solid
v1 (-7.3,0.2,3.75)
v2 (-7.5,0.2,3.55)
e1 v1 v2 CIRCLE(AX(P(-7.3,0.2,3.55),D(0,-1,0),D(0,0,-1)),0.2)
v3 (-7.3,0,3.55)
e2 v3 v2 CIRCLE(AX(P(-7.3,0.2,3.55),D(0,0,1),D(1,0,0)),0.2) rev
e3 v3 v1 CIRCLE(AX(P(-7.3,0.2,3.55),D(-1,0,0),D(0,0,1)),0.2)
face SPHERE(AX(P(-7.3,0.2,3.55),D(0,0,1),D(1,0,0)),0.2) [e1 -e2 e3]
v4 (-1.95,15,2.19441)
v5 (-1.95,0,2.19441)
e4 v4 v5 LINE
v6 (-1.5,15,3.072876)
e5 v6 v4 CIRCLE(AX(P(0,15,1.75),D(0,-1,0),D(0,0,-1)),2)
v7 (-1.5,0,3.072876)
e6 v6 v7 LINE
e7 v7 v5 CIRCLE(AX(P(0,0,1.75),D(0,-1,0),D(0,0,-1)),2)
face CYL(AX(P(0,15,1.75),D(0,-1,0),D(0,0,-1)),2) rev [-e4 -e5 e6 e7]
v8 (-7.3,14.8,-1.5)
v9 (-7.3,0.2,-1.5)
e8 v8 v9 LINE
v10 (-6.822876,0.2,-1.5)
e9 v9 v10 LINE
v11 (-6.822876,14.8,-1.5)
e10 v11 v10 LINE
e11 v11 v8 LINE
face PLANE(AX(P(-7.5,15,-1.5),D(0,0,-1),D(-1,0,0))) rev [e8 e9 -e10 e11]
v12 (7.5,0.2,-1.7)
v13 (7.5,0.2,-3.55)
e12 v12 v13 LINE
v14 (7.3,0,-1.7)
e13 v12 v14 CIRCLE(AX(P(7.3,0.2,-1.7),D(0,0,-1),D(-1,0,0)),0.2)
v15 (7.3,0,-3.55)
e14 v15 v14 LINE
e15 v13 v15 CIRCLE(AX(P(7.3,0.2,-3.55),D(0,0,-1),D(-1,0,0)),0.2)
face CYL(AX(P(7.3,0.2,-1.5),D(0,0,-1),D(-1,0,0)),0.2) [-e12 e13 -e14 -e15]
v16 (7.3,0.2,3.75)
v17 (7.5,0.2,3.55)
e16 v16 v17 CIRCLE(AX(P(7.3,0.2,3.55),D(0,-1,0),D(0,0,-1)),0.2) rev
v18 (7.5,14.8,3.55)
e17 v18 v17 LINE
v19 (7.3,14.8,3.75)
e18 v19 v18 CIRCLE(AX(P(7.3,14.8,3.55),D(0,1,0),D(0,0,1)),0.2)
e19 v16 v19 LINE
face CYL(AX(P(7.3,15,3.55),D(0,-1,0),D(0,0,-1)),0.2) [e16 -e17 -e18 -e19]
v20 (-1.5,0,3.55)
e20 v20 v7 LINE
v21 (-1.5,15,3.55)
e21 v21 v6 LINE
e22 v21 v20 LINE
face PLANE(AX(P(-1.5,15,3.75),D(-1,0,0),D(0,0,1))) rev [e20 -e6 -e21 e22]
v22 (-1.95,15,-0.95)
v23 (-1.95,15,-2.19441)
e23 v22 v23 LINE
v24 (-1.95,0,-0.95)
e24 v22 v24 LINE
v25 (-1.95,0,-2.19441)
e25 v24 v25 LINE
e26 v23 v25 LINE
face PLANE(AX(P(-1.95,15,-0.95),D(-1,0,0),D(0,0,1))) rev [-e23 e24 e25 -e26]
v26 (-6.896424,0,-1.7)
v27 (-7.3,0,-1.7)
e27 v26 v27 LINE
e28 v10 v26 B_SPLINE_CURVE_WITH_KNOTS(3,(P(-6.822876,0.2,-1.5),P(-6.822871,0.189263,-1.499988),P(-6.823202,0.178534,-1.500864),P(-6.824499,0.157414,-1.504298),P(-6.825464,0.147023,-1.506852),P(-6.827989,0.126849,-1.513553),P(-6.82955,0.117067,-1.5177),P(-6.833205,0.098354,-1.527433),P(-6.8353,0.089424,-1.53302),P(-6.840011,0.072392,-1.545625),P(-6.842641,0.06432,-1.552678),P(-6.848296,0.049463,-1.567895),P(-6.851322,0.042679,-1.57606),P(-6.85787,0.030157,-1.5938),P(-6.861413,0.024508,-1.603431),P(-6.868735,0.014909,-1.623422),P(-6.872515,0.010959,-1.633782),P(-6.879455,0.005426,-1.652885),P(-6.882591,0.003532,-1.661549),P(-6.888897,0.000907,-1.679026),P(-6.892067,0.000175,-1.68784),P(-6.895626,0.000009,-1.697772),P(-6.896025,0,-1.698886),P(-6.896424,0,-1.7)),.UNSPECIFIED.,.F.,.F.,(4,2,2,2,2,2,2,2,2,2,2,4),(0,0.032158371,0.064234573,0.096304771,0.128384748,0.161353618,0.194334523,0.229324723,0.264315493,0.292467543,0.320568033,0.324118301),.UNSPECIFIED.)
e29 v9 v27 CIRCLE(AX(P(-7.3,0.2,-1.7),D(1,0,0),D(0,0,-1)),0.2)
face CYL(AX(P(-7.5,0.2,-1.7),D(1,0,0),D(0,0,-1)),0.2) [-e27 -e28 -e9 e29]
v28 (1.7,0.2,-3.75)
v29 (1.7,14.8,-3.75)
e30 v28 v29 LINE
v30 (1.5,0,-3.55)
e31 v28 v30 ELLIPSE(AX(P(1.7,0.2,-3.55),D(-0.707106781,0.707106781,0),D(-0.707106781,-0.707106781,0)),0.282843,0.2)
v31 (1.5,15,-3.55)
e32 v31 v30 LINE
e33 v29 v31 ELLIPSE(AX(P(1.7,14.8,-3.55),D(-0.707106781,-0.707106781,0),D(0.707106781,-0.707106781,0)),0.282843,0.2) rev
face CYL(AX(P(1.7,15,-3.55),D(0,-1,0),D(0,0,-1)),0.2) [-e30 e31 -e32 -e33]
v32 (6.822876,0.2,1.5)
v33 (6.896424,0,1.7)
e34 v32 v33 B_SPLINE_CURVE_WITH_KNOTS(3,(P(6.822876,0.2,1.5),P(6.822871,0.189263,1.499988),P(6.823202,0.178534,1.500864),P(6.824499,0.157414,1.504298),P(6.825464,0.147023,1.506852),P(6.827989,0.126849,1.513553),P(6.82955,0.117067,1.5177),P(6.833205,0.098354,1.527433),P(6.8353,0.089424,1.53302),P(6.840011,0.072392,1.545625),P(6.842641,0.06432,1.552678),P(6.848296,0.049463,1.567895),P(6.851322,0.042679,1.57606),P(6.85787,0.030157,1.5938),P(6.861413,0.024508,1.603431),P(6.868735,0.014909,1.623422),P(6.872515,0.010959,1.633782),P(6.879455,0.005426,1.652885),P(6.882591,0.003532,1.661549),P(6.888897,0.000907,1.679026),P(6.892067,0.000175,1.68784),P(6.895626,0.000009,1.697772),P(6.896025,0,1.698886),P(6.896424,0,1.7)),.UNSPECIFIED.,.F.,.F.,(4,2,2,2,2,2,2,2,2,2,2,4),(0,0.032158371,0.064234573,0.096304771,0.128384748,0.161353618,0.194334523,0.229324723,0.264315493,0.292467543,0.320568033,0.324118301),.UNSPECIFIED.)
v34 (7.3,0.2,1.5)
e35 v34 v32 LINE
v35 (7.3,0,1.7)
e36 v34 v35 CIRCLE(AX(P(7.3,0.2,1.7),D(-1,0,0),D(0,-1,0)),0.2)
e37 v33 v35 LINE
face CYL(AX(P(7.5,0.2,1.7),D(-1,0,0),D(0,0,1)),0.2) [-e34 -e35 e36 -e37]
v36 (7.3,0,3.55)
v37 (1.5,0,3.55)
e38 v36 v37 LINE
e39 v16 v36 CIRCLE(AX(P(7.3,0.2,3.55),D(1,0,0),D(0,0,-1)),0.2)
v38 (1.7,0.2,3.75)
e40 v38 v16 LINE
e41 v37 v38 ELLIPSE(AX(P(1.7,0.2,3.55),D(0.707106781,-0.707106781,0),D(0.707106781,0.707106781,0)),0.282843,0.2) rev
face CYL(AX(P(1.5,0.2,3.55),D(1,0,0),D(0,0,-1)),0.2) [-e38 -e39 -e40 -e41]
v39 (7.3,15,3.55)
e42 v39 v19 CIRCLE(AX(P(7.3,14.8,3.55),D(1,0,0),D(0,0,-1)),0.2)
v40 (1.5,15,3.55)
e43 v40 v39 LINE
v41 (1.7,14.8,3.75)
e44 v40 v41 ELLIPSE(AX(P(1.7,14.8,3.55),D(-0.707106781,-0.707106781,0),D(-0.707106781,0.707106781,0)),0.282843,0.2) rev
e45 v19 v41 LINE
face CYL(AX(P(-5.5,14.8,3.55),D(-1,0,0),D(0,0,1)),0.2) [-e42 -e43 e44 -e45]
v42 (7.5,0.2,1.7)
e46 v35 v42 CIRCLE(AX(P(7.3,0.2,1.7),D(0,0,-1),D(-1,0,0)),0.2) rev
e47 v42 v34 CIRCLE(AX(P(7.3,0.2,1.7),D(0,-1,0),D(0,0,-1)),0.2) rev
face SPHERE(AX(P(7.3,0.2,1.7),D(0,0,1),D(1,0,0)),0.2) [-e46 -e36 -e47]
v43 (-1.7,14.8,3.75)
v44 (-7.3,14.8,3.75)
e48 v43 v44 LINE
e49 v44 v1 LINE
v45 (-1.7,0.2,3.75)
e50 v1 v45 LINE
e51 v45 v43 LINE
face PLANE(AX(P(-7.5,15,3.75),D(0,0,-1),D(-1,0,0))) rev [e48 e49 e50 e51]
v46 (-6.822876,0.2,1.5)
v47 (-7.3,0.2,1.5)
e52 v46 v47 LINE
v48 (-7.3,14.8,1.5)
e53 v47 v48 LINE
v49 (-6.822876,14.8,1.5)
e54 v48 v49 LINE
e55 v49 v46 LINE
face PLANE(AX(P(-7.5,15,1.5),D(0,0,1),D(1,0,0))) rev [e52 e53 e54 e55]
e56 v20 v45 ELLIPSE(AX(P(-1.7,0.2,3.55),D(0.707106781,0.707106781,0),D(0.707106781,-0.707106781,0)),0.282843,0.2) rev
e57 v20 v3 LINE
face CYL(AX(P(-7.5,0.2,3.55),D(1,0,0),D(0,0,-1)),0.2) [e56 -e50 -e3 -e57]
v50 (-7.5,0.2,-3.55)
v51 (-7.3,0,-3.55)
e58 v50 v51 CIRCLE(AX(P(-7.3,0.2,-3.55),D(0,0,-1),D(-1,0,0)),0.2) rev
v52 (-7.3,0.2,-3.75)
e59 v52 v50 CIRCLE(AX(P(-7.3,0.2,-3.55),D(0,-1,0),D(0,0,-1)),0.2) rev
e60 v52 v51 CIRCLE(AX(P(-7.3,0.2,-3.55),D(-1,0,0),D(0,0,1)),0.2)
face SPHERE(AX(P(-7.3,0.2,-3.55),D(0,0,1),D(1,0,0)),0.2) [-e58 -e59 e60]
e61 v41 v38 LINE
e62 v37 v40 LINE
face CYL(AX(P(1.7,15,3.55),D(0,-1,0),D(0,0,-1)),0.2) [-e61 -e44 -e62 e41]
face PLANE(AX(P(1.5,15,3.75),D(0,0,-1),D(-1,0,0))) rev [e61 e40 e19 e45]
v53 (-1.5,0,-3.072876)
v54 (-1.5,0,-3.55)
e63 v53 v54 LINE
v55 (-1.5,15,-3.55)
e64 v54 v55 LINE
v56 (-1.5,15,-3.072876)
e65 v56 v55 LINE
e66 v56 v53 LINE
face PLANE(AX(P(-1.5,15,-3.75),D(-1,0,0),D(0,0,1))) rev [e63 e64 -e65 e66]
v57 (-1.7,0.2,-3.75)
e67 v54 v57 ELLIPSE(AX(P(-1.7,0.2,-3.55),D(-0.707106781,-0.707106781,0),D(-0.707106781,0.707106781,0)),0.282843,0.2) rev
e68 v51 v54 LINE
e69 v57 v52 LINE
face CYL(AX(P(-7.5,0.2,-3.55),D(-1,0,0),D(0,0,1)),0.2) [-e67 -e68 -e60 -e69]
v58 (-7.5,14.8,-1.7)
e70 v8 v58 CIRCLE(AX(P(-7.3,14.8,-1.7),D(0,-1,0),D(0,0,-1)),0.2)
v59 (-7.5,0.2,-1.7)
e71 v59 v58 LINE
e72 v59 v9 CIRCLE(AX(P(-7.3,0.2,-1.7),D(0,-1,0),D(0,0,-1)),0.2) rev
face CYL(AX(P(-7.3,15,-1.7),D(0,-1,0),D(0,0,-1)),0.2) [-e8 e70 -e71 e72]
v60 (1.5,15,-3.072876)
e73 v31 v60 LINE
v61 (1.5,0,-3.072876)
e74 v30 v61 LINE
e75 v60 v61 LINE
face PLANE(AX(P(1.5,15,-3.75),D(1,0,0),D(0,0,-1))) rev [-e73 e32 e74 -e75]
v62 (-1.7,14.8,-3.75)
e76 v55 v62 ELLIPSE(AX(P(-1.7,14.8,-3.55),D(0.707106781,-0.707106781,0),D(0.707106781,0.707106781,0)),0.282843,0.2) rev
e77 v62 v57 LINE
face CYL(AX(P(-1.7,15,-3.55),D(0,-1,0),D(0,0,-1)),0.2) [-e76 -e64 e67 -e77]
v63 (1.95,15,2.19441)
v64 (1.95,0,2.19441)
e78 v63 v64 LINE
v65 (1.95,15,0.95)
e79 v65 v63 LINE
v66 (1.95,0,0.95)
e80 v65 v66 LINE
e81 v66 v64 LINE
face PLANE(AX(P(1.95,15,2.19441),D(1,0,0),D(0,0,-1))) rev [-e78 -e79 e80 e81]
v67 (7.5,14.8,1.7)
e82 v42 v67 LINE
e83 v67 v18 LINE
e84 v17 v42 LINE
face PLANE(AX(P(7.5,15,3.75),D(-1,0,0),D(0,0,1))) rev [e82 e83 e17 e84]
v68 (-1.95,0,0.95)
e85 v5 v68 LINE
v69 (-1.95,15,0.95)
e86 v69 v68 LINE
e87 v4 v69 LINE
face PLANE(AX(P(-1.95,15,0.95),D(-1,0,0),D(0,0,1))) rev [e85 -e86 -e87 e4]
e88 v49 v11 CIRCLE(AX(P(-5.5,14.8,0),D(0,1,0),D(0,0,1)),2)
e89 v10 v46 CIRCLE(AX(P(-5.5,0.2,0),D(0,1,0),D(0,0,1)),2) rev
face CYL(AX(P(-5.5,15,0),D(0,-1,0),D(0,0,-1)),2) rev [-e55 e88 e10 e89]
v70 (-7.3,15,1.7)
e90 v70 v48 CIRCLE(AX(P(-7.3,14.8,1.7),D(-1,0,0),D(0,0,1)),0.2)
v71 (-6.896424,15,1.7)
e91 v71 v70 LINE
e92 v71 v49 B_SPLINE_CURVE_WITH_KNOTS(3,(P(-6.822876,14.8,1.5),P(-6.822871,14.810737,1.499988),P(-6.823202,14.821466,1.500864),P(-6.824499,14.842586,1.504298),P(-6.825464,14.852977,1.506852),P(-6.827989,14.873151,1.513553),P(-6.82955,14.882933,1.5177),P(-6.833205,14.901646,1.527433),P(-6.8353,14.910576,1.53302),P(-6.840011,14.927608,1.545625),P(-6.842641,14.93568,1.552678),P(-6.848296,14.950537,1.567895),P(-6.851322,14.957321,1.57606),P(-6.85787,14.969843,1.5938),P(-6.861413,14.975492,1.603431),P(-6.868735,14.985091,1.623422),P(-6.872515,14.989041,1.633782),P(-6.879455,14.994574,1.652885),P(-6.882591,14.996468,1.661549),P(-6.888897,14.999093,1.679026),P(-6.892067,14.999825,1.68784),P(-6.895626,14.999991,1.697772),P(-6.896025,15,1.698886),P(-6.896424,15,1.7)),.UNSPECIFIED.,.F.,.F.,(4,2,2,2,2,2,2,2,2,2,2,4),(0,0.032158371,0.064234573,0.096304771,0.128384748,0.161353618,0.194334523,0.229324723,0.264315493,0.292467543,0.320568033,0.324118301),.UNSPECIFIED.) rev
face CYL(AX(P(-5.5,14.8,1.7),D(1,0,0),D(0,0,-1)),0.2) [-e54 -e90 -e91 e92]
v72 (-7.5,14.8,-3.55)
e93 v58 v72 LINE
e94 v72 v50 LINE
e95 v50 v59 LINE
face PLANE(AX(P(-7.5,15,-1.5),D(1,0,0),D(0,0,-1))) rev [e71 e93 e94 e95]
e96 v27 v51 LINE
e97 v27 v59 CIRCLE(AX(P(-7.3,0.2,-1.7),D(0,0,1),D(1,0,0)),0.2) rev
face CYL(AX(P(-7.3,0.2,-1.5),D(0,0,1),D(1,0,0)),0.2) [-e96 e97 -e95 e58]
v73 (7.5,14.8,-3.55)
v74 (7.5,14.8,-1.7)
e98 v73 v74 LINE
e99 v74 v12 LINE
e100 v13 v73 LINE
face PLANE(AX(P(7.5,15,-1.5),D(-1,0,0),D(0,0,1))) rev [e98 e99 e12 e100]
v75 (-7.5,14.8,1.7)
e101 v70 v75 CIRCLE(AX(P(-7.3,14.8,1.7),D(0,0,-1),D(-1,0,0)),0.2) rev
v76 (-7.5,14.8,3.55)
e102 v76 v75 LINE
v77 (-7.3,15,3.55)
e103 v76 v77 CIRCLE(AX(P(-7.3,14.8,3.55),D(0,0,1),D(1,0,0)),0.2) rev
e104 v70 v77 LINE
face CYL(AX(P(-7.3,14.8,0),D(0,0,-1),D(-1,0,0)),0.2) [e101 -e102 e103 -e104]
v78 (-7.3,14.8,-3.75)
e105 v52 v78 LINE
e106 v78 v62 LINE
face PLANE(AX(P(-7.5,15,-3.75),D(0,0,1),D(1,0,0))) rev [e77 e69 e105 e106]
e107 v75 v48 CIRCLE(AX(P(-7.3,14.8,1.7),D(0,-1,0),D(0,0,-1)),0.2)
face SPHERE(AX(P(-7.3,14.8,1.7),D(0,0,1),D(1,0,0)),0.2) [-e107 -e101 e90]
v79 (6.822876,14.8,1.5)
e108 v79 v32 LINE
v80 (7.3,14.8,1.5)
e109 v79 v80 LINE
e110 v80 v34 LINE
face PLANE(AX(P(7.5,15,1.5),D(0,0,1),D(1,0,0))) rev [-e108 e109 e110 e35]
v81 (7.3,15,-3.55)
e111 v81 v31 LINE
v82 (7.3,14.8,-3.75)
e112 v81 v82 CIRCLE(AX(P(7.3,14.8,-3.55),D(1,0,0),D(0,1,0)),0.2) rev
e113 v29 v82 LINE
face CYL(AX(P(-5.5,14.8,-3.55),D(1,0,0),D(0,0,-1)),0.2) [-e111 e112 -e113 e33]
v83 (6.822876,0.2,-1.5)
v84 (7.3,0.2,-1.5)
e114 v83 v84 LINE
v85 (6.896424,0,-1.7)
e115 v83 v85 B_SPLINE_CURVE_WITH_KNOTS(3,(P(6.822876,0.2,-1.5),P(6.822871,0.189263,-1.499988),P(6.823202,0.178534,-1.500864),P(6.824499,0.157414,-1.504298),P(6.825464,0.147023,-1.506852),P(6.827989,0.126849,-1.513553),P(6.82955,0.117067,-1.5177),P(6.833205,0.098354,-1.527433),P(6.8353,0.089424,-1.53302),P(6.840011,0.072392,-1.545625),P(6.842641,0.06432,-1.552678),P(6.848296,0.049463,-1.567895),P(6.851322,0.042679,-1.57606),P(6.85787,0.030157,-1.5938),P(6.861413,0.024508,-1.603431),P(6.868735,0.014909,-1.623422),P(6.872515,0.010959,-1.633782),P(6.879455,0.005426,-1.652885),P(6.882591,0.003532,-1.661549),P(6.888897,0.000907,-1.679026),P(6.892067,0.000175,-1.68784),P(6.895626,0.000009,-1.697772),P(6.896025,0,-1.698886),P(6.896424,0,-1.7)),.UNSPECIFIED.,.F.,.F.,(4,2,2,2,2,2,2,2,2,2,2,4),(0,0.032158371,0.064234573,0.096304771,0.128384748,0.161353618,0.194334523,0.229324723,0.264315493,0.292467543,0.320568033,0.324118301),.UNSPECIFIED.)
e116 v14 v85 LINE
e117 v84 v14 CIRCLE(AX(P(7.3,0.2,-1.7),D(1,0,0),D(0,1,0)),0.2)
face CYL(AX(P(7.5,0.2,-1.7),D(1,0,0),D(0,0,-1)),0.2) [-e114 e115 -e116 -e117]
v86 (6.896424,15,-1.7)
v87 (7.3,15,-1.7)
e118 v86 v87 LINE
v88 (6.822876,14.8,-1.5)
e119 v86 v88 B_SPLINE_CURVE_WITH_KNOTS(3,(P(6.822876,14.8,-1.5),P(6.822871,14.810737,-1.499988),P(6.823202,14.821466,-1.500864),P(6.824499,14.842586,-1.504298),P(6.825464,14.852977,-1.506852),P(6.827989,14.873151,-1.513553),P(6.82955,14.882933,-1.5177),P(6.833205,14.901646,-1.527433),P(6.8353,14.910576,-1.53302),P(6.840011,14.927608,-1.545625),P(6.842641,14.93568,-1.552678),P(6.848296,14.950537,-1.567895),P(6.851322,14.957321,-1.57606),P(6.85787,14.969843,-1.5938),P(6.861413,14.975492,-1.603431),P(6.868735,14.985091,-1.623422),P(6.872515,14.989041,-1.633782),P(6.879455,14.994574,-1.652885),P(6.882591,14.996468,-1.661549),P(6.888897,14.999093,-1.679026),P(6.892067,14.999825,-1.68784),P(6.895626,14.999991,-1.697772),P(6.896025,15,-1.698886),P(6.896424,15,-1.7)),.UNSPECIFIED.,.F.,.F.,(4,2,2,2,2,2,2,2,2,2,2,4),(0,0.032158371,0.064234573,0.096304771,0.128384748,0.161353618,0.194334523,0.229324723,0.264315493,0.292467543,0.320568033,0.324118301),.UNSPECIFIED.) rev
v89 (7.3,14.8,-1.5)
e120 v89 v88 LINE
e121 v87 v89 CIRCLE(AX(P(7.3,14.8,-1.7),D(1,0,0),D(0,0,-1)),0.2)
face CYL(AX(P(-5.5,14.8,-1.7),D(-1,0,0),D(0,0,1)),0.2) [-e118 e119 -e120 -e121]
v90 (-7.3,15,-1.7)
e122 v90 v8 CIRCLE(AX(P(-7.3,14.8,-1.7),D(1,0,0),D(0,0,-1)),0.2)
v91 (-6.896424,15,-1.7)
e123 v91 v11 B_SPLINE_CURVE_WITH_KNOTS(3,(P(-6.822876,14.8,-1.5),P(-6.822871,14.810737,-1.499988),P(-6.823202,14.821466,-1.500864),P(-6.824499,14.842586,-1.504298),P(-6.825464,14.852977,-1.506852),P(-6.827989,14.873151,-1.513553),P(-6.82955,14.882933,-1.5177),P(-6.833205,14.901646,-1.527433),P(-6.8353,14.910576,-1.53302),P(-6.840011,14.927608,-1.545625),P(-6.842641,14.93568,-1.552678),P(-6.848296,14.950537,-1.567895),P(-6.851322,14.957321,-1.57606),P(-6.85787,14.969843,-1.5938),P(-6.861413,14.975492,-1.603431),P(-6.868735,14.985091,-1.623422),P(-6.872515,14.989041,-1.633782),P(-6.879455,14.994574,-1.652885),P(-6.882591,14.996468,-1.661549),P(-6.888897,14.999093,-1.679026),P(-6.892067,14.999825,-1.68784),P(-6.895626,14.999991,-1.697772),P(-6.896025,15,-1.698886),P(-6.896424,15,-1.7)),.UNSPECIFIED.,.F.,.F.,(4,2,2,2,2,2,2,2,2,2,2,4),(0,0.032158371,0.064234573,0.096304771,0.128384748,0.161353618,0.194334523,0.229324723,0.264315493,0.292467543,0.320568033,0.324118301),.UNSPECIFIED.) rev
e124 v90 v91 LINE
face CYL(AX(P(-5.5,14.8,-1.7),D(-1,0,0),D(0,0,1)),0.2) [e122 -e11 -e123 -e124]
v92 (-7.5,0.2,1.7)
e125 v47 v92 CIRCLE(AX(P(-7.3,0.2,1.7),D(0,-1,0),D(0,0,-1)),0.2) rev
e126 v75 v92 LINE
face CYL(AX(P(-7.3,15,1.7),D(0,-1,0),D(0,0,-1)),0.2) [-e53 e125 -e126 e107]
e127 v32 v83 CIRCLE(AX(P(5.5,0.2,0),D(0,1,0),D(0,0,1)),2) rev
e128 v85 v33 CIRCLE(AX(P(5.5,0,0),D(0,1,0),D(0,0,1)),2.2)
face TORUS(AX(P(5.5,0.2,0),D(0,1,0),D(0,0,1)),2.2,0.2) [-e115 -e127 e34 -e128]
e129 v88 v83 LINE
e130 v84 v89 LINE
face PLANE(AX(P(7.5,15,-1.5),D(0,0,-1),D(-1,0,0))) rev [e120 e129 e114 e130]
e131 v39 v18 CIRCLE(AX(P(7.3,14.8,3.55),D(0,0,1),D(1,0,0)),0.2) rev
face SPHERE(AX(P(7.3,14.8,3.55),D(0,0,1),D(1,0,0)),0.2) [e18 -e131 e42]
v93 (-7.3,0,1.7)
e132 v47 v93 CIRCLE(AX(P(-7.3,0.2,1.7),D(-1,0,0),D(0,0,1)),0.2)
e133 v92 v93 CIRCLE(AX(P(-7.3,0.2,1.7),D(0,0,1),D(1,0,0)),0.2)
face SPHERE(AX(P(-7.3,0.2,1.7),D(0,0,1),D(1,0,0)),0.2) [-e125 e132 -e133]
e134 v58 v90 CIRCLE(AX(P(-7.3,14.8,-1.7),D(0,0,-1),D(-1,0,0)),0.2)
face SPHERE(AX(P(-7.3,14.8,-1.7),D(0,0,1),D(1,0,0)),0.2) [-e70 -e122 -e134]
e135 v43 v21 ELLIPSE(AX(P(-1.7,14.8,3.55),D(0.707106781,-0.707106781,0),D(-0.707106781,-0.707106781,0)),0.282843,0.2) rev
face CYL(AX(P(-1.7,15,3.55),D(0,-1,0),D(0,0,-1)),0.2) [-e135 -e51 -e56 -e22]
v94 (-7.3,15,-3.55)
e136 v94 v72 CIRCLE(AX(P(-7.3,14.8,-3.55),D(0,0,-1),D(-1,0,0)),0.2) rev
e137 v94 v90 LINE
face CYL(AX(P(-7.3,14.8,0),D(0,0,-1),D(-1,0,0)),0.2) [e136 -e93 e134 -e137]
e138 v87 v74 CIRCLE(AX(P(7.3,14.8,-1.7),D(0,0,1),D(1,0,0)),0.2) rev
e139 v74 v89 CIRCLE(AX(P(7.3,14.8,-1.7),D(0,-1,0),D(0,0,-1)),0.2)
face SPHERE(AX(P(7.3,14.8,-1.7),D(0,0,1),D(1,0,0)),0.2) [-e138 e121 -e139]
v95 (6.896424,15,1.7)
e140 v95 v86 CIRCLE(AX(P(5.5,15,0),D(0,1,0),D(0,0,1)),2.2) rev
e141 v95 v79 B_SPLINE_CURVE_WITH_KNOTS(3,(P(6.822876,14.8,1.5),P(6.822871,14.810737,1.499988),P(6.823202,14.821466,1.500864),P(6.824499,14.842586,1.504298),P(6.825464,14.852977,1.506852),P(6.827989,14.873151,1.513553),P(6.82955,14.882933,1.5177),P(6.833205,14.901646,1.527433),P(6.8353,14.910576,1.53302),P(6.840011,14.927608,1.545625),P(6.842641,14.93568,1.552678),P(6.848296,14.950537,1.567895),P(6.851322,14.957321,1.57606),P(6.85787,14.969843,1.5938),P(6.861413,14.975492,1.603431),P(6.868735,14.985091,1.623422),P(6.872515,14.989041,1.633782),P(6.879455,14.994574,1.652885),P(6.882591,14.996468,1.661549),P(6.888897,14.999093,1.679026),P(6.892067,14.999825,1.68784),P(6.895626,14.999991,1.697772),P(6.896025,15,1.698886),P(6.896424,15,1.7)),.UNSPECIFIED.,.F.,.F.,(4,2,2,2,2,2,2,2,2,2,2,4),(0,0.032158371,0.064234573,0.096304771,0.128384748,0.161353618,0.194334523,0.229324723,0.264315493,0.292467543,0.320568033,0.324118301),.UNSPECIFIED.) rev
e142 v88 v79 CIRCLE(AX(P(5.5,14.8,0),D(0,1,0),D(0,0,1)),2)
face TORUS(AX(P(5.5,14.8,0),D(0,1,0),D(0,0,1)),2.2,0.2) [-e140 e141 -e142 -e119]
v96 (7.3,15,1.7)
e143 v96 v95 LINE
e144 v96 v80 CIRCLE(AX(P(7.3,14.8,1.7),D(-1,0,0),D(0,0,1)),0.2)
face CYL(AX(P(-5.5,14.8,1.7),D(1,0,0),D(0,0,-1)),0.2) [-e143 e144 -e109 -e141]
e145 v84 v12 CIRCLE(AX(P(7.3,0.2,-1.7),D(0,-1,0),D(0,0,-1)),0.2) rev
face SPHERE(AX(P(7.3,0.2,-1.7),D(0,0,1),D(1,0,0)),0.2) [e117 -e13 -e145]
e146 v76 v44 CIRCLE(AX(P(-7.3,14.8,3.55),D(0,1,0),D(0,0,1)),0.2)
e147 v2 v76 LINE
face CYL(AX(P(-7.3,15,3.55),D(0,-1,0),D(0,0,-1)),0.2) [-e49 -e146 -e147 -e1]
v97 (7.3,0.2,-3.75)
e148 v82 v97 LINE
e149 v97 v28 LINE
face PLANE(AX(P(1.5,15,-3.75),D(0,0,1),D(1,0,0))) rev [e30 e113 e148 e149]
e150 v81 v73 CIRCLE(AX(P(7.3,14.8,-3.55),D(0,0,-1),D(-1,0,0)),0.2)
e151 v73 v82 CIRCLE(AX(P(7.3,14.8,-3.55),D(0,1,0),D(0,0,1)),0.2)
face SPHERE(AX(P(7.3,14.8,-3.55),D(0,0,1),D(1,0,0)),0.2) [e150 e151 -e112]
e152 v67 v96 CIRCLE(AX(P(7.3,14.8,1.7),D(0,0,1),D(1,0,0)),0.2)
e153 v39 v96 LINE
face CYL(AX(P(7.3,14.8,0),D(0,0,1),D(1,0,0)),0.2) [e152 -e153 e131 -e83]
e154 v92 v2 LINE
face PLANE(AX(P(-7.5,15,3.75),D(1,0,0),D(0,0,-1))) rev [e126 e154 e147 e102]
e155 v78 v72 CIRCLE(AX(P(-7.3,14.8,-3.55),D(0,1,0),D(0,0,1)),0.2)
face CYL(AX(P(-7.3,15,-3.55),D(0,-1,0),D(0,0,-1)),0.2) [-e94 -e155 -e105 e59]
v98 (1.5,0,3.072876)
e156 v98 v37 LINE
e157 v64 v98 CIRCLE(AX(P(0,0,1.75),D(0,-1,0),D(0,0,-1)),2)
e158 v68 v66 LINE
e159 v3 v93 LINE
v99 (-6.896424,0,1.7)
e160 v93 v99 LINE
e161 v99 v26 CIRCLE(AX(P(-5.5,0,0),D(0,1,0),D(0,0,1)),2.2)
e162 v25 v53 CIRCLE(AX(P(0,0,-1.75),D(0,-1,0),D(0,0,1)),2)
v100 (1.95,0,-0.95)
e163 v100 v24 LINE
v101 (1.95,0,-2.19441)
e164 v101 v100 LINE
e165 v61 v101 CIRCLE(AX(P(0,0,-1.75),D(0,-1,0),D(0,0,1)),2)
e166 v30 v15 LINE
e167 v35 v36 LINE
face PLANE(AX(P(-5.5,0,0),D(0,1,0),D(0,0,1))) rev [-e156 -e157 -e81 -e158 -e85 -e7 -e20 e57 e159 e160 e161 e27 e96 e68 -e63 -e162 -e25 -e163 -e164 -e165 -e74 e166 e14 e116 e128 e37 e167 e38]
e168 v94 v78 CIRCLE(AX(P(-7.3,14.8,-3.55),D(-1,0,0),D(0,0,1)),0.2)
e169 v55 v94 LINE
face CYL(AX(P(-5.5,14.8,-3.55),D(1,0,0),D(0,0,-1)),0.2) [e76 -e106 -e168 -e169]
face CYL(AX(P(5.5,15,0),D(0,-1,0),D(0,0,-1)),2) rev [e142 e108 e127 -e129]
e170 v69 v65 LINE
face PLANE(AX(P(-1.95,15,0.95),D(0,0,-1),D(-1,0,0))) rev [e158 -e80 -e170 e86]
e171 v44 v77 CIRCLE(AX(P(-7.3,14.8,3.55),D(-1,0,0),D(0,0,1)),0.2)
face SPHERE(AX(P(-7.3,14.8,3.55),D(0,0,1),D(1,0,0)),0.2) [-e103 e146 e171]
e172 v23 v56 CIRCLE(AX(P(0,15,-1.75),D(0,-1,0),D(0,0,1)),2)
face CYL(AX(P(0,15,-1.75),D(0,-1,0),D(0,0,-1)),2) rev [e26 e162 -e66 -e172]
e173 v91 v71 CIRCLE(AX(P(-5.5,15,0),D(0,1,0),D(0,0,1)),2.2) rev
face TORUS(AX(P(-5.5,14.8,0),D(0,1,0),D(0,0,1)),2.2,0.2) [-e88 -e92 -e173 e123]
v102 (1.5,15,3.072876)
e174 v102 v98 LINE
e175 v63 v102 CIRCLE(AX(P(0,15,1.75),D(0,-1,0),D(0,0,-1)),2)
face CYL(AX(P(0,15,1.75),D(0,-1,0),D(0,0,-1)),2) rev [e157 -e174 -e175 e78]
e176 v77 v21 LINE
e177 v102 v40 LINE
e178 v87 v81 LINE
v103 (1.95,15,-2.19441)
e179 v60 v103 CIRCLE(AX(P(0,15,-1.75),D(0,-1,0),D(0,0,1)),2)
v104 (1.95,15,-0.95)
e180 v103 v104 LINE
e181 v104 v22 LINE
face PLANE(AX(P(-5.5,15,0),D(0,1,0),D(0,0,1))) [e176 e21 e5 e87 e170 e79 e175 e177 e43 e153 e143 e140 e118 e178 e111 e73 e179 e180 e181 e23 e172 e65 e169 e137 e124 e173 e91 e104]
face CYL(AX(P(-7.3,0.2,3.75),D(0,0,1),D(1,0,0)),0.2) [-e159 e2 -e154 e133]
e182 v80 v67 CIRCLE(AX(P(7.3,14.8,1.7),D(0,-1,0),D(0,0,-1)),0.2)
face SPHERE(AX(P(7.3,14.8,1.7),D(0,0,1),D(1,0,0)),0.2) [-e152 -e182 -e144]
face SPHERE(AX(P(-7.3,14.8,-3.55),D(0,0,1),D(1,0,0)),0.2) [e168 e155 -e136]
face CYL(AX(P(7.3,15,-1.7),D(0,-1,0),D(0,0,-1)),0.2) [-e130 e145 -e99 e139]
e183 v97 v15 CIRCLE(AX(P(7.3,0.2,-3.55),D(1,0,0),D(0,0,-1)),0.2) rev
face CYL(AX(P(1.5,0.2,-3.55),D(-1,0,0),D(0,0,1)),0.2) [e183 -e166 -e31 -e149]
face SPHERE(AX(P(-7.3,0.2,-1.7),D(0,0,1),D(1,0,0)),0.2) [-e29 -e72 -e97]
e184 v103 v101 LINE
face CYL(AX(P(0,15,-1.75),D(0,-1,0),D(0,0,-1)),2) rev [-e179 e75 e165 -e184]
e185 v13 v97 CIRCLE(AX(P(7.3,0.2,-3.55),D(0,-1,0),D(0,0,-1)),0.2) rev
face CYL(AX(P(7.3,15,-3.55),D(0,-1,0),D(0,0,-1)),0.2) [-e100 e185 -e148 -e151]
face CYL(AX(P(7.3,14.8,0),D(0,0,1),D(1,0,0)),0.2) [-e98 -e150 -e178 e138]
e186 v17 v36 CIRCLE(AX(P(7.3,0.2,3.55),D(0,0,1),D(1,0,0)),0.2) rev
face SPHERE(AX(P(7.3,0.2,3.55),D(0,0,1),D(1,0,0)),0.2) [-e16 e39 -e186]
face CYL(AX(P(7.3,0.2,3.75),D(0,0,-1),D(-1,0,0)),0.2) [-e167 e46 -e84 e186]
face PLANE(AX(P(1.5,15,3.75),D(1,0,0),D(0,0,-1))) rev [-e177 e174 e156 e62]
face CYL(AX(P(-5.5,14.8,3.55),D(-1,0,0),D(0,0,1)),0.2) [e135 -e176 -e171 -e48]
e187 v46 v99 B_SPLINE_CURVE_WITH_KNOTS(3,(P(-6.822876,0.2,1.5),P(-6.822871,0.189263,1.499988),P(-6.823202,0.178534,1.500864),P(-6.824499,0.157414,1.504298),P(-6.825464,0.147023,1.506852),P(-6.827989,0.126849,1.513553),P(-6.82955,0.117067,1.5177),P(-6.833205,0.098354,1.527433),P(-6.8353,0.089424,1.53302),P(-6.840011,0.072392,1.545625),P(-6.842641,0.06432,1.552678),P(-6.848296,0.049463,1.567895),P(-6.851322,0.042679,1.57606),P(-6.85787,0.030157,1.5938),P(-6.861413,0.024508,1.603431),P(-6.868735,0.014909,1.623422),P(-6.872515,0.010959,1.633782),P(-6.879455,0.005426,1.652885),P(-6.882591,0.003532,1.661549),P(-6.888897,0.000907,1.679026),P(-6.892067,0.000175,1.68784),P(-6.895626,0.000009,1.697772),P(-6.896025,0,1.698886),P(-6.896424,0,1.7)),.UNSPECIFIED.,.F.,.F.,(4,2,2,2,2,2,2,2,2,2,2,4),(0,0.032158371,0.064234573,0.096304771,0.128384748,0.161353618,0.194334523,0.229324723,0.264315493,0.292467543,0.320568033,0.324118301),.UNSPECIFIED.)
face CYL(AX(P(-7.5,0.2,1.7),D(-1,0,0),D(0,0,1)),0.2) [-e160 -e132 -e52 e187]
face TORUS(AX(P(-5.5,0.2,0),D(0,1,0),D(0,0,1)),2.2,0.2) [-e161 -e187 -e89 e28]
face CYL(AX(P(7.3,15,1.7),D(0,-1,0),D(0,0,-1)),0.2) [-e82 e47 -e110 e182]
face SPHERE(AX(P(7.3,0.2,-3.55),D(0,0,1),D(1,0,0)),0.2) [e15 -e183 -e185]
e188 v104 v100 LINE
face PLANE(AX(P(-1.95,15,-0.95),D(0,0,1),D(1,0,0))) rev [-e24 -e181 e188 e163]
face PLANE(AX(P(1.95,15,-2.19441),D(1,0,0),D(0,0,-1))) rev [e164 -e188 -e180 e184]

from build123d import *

# Parameters (mm, degrees)
EXTRUDE_1_DEPTH = 15
FILLET_1_R      = 0.2
FILLET_2_R      = 0.2


with BuildPart() as part:
    # 草图1 → 凸台-拉伸1 (new body)
    with BuildSketch(Plane(origin=(0, 0, 0), x_dir=(1, 0, 0), z_dir=(0, 1, 0))):
        with BuildLine():
            Line((-1.4999999999999998, 3.75), (-1.4999999999999998, 3.0728756555322954))
            ThreePointArc((-1.4999999999999998, 3.0728756555322954), (-1.7800423027536112, 2.6618384727612785), (-1.95, 2.1944097208657793))
            Line((-1.95, 2.1944097208657793), (-1.95, 0.95))
            Line((-1.95, 0.95), (1.9500000000000004, 0.9500000000000001))
            Line((1.9500000000000004, 0.9500000000000001), (1.9500000000000002, 2.194409720865779))
            ThreePointArc((1.9500000000000002, 2.194409720865779), (1.7800423027536114, 2.661838472761278), (1.5000000000000002, 3.072875655532295))
            Line((1.5000000000000002, 3.072875655532295), (1.4999999999999998, 3.75))
            Line((1.4999999999999998, 3.75), (7.5, 3.75))
            Line((7.5, 3.75), (7.5, 1.5))
            Line((7.5, 1.5), (6.822875655532296, 1.4999999999999998))
            ThreePointArc((6.822875655532296, 1.4999999999999998), (3.5, 2.4e-16), (6.822875655532294, -1.4999999999999996))
            Line((6.822875655532294, -1.4999999999999996), (7.5, -1.5))
            Line((7.5, -1.5), (7.5, -3.75))
            Line((7.5, -3.75), (1.4999999999999998, -3.75))
            Line((1.4999999999999998, -3.75), (1.5000000000000002, -3.072875655532295))
            ThreePointArc((1.5000000000000002, -3.072875655532295), (1.7800423027536114, -2.661838472761278), (1.9500000000000002, -2.194409720865779))
            Line((1.9500000000000002, -2.194409720865779), (1.9500000000000004, -0.9500000000000001))
            Line((1.9500000000000004, -0.9500000000000001), (-1.95, -0.95))
            Line((-1.95, -0.95), (-1.95, -2.1944097208657793))
            ThreePointArc((-1.95, -2.1944097208657793), (-1.7800423027536112, -2.6618384727612785), (-1.4999999999999998, -3.0728756555322954))
            Line((-1.4999999999999998, -3.0728756555322954), (-1.4999999999999998, -3.75))
            Line((-1.4999999999999998, -3.75), (-7.5, -3.75))
            Line((-7.5, -3.75), (-7.5, -1.5))
            Line((-7.5, -1.5), (-6.822875655532295, -1.5))
            ThreePointArc((-6.822875655532295, -1.5), (-3.5, 8.9e-16), (-6.822875655532296, 1.5))
            Line((-6.822875655532296, 1.5), (-7.5, 1.5))
            Line((-7.5, 1.5), (-7.5, 3.75))
            Line((-7.5, 3.75), (-1.4999999999999998, 3.75))
        make_face()
    extrude(amount=EXTRUDE_1_DEPTH)

    # 圆角1
    fillet_1_edges = [part.edges().sort_by_distance(p)[0] for p in [
        (-7.5, 0, -2.625),
        (-4.5, 0, -3.75),
        (4.5, 0, -3.75),
        (7.5, 0, -2.625),
        (7.5, 0, 2.625),
        (4.5, 0, 3.75),
        (4.5, 15, 3.75),
        (7.5, 15, 2.625),
        (-4.5, 0, 3.75),
        (-7.5, 0, 2.625),
        (-7.5, 15, 2.625),
        (-7.5, 7.5, 1.5),
        (-7.5, 7.5, -1.5),
        (-7.5, 7.5, -3.75),
        (-1.4999999999999998, 7.5, -3.75),
        (1.4999999999999998, 7.5, -3.75),
        (7.5, 7.5, -3.75),
        (7.5, 7.5, -1.5),
        (7.5, 7.5, 1.5),
        (7.5, 7.5, 3.75),
        (1.4999999999999998, 7.5, 3.75),
        (7.5, 15, -2.625),
        (-1.4999999999999998, 7.5, 3.75),
        (-7.5, 7.5, 3.75),
        (4.5, 15, -3.75),
        (-4.5, 15, 3.75),
        (-4.5, 15, -3.75),
        (-7.5, 15, -2.625),
    ]]
    fillet(fillet_1_edges, radius=FILLET_1_R)

    # 圆角2
    # the kernel refuses this fillet: 0.2 mm, written as the material it takes off along each edge
    with BuildSketch(Plane(origin=(-7.3, 14.8, 1.7), x_dir=(0, 0, -1), z_dir=(0, 1, 0))) as fillet_2_piece_1_section:
        Polygon((0, 0), (FILLET_2_R, 0), (FILLET_2_R, FILLET_2_R), (0, FILLET_2_R), align=None)
    fillet_2_piece_1 = extrude(amount=FILLET_2_R, mode=Mode.PRIVATE)
    fillet_2_piece_1 = fillet_2_piece_1 - Plane(origin=(-7.3, 14.8, 1.7), x_dir=(0.7071067811865475, 0, 0.7071067811865475), z_dir=(0, 1, 0)) * Sphere(FILLET_2_R, mode=Mode.PRIVATE)
    add(fillet_2_piece_1, mode=Mode.SUBTRACT)
    with BuildSketch(Plane(origin=(-7.3, 0.2, 1.7), x_dir=(0, 0, -1), z_dir=(0, -1, 0))) as fillet_2_piece_2_section:
        Polygon((0, 0), (FILLET_2_R, 0), (FILLET_2_R, -FILLET_2_R), (0, -FILLET_2_R), align=None)
    fillet_2_piece_2 = extrude(amount=FILLET_2_R, mode=Mode.PRIVATE)
    fillet_2_piece_2 = fillet_2_piece_2 - Plane(origin=(-7.3, 0.2, 1.7), x_dir=(0.7071067811865475, 0, 0.7071067811865475), z_dir=(0, -1, 0)) * Sphere(FILLET_2_R, mode=Mode.PRIVATE)
    add(fillet_2_piece_2, mode=Mode.SUBTRACT)
    with BuildSketch(Plane(origin=(-7.3, 0.2, -1.7), x_dir=(0, -1, 0), z_dir=(0, 0, 1))) as fillet_2_piece_3_section:
        Polygon((0, 0), (FILLET_2_R, 0), (FILLET_2_R, -FILLET_2_R), (0, -FILLET_2_R), align=None)
    fillet_2_piece_3 = extrude(amount=FILLET_2_R, mode=Mode.PRIVATE)
    fillet_2_piece_3 = fillet_2_piece_3 - Plane(origin=(-7.3, 0.2, -1.7), x_dir=(0.7071067811865475, 0.7071067811865475, 0), z_dir=(0, 0, 1)) * Sphere(FILLET_2_R, mode=Mode.PRIVATE)
    add(fillet_2_piece_3, mode=Mode.SUBTRACT)
    with BuildSketch(Plane(origin=(-7.3, 14.8, -1.7), x_dir=(0, 1, 0), z_dir=(0, 0, 1))) as fillet_2_piece_4_section:
        Polygon((0, 0), (FILLET_2_R, 0), (FILLET_2_R, FILLET_2_R), (0, FILLET_2_R), align=None)
    fillet_2_piece_4 = extrude(amount=FILLET_2_R, mode=Mode.PRIVATE)
    fillet_2_piece_4 = fillet_2_piece_4 - Plane(origin=(-7.3, 14.8, -1.7), x_dir=(0.7071067811865475, -0.7071067811865475, 0), z_dir=(0, 0, 1)) * Sphere(FILLET_2_R, mode=Mode.PRIVATE)
    add(fillet_2_piece_4, mode=Mode.SUBTRACT)
    with BuildSketch(Plane(origin=(7.3, 0.2, -1.7), x_dir=(3.3e-16, 0, 1), z_dir=(0, -1, 0))) as fillet_2_piece_5_section:
        Polygon((0, 0), (FILLET_2_R, 0), (FILLET_2_R, -FILLET_2_R), (7e-17, -FILLET_2_R), align=None)
    fillet_2_piece_5 = extrude(amount=FILLET_2_R, mode=Mode.PRIVATE)
    fillet_2_piece_5 = fillet_2_piece_5 - Plane(origin=(7.3, 0.2, -1.7), x_dir=(-0.7071067811865477, 0, -0.7071067811865475), z_dir=(0, -1, 0)) * Sphere(FILLET_2_R, mode=Mode.PRIVATE)
    add(fillet_2_piece_5, mode=Mode.SUBTRACT)
    with BuildSketch(Plane(origin=(7.3, 14.8, -1.7), x_dir=(3.3e-16, 0, 1), z_dir=(0, 1, 0))) as fillet_2_piece_6_section:
        Polygon((0, 0), (FILLET_2_R, 0), (FILLET_2_R, FILLET_2_R), (7e-17, FILLET_2_R), align=None)
    fillet_2_piece_6 = extrude(amount=FILLET_2_R, mode=Mode.PRIVATE)
    fillet_2_piece_6 = fillet_2_piece_6 - Plane(origin=(7.3, 14.8, -1.7), x_dir=(-0.7071067811865477, 0, -0.7071067811865475), z_dir=(0, 1, 0)) * Sphere(FILLET_2_R, mode=Mode.PRIVATE)
    add(fillet_2_piece_6, mode=Mode.SUBTRACT)
    with BuildSketch(Plane(origin=(7.3, 0.2, 1.6999999999999997), x_dir=(6.6e-16, 0, -1), z_dir=(0, -1, 0))) as fillet_2_piece_7_section:
        Polygon((0, 0), (FILLET_2_R, 0), (FILLET_2_R, FILLET_2_R), (1.3e-16, FILLET_2_R), align=None)
    fillet_2_piece_7 = extrude(amount=FILLET_2_R, mode=Mode.PRIVATE)
    fillet_2_piece_7 = fillet_2_piece_7 - Plane(origin=(7.3, 0.2, 1.6999999999999997), x_dir=(-0.7071067811865477, 0, 0.7071067811865472), z_dir=(0, -1, 0)) * Sphere(FILLET_2_R, mode=Mode.PRIVATE)
    add(fillet_2_piece_7, mode=Mode.SUBTRACT)
    with BuildSketch(Plane(origin=(7.3, 14.8, 1.6999999999999997), x_dir=(6.6e-16, 0, -1), z_dir=(0, 1, 0))) as fillet_2_piece_8_section:
        Polygon((0, 0), (FILLET_2_R, 0), (FILLET_2_R, -FILLET_2_R), (1.3e-16, -FILLET_2_R), align=None)
    fillet_2_piece_8 = extrude(amount=FILLET_2_R, mode=Mode.PRIVATE)
    fillet_2_piece_8 = fillet_2_piece_8 - Plane(origin=(7.3, 14.8, 1.6999999999999997), x_dir=(-0.7071067811865477, 0, 0.7071067811865472), z_dir=(0, 1, 0)) * Sphere(FILLET_2_R, mode=Mode.PRIVATE)
    add(fillet_2_piece_8, mode=Mode.SUBTRACT)
    with BuildSketch(Plane(origin=(-7.3, 0, 1.5), x_dir=(0, 0, 1), z_dir=(1, 0, 0))) as fillet_2_piece_9:
        with BuildLine():
            CenterArc((FILLET_2_R, -FILLET_2_R), FILLET_2_R, 90, 90)
            Line((0, -FILLET_2_R), (0, 0))
            Line((0, 0), (FILLET_2_R, 0))
        make_face()
    extrude(amount=0.9771243444677049, mode=Mode.SUBTRACT)
    with BuildSketch(Plane(origin=(-5.5, 0, -1.22e-15), x_dir=(-0.8269112079398366, 0, 0.5623325121167017), z_dir=(-0.5623325121167017, 0, -0.8269112079398366))) as fillet_2_piece_10:
        with BuildLine():
            CenterArc((2.0000000000000093 + FILLET_2_R, FILLET_2_R), FILLET_2_R, 180, 90)
            Line((2.0000000000000093, FILLET_2_R), (2.0000000000000093, 0))
            Line((2.0000000000000093, 0), (2.0000000000000093 + FILLET_2_R, 0))
        make_face()
    revolve(axis=Axis((-5.5, 0, -1.22e-15), (0, 1, 0)), revolution_arc=291.565479050289, mode=Mode.SUBTRACT)
    with BuildSketch(Plane(origin=(7.3, 0, -1.5), x_dir=(-3.3e-16, 0, -1), z_dir=(-1, 0, 3.3e-16))) as fillet_2_piece_11:
        with BuildLine():
            CenterArc((FILLET_2_R, -FILLET_2_R), FILLET_2_R, 90, 90)
            Line((0, -FILLET_2_R), (0, 0))
            Line((0, 0), (FILLET_2_R, 0))
        make_face()
    extrude(amount=0.977124344467704, mode=Mode.SUBTRACT)
    with BuildSketch(Plane(origin=(5.5, 0, -1.61e-15), x_dir=(0.8269112079398374, 0, -0.5623325121167005), z_dir=(0.5623325121167005, 0, 0.8269112079398374))) as fillet_2_piece_12:
        with BuildLine():
            CenterArc((2.0000000000000084 + FILLET_2_R, FILLET_2_R), FILLET_2_R, 180, 90)
            Line((2.0000000000000084, FILLET_2_R), (2.0000000000000084, 0))
            Line((2.0000000000000084, 0), (2.0000000000000084 + FILLET_2_R, 0))
        make_face()
    revolve(axis=Axis((5.5, 0, -1.61e-15), (0, 1, 0)), revolution_arc=291.565479050289, mode=Mode.SUBTRACT)
    with BuildSketch(Plane(origin=(5.5, 15, -1.61e-15), x_dir=(0.8269112079398374, 0, -0.5623325121167005), z_dir=(0.5623325121167005, 0, 0.8269112079398374))) as fillet_2_piece_13:
        with BuildLine():
            CenterArc((2.0000000000000084 + FILLET_2_R, -FILLET_2_R), FILLET_2_R, 90, 90)
            Line((2.0000000000000084, -FILLET_2_R), (2.0000000000000084, 0))
            Line((2.0000000000000084, 0), (2.0000000000000084 + FILLET_2_R, 0))
        make_face()
    revolve(axis=Axis((5.5, 15, -1.61e-15), (0, 1, 0)), revolution_arc=291.565479050289, mode=Mode.SUBTRACT)
    with BuildSketch(Plane(origin=(7.3, 15, -1.5), x_dir=(-3.3e-16, 0, -1), z_dir=(-1, 0, 3.3e-16))) as fillet_2_piece_14:
        with BuildLine():
            CenterArc((FILLET_2_R, FILLET_2_R), FILLET_2_R, 180, 90)
            Line((0, FILLET_2_R), (0, 0))
            Line((0, 0), (FILLET_2_R, 0))
        make_face()
    extrude(amount=0.977124344467704, mode=Mode.SUBTRACT)
    with BuildSketch(Plane(origin=(6.322875655532294, 15, 1.4999999999999993), x_dir=(-6.6e-16, 0, 1), z_dir=(1, 0, 6.6e-16))) as fillet_2_piece_15:
        with BuildLine():
            CenterArc((FILLET_2_R, FILLET_2_R), FILLET_2_R, 180, 90)
            Line((0, FILLET_2_R), (0, 0))
            Line((0, 0), (FILLET_2_R, 0))
        make_face()
    extrude(amount=0.9771243444677058, mode=Mode.SUBTRACT)
    with BuildSketch(Plane(origin=(-6.322875655532296, 15, -1.5), x_dir=(0, -1, 0), z_dir=(-1, 0, 0))) as fillet_2_piece_16:
        with BuildLine():
            CenterArc((FILLET_2_R, -FILLET_2_R), FILLET_2_R, 90, 90)
            Line((0, -FILLET_2_R), (0, 0))
            Line((0, 0), (FILLET_2_R, 0))
        make_face()
    extrude(amount=0.977124344467704, mode=Mode.SUBTRACT)
    with BuildSketch(Plane(origin=(-5.5, 15, -1.22e-15), x_dir=(-0.8269112079398366, 0, 0.5623325121167017), z_dir=(-0.5623325121167017, 0, -0.8269112079398366))) as fillet_2_piece_17:
        with BuildLine():
            CenterArc((2.000000000000001 + FILLET_2_R, -FILLET_2_R), FILLET_2_R, 89.99999999999987, 90.00000000000011)
            Line((2.000000000000001 + FILLET_2_R, 0), (2.000000000000001, 0))
            Line((2.000000000000001, 0), (2.0000000000000004, -FILLET_2_R))
        make_face()
    revolve(axis=Axis((-5.5, 15, -1.22e-15), (0, 1, 0)), revolution_arc=291.565479050289, mode=Mode.SUBTRACT)
    with BuildSketch(Plane(origin=(-6.322875655532296, 0, -1.5), x_dir=(0, 1, 0), z_dir=(-1, 0, 0))) as fillet_2_piece_18:
        with BuildLine():
            CenterArc((FILLET_2_R, FILLET_2_R), FILLET_2_R, 180, 90)
            Line((-3e-17, FILLET_2_R), (0, 0))
            Line((0, 0), (FILLET_2_R, 0))
        make_face()
    extrude(amount=0.977124344467704, mode=Mode.SUBTRACT)
    with BuildSketch(Plane(origin=(-7.3, 15, 1.5), x_dir=(0, 0, 1), z_dir=(1, 0, 0))) as fillet_2_piece_19:
        with BuildLine():
            CenterArc((FILLET_2_R, FILLET_2_R), FILLET_2_R, 180, 90)
            Line((0, FILLET_2_R), (0, 0))
            Line((0, 0), (FILLET_2_R, 0))
        make_face()
    extrude(amount=0.9771243444677049, mode=Mode.SUBTRACT)
    with BuildSketch(Plane(origin=(6.322875655532294, 0, 1.4999999999999993), x_dir=(-6.6e-16, 0, 1), z_dir=(1, 0, 6.6e-16))) as fillet_2_piece_20:
        with BuildLine():
            CenterArc((FILLET_2_R, -FILLET_2_R), FILLET_2_R, 90, 90)
            Line((0, -FILLET_2_R), (0, 0))
            Line((0, 0), (FILLET_2_R, 0))
        make_face()
    extrude(amount=0.9771243444677058, mode=Mode.SUBTRACT)


solid = part.part
